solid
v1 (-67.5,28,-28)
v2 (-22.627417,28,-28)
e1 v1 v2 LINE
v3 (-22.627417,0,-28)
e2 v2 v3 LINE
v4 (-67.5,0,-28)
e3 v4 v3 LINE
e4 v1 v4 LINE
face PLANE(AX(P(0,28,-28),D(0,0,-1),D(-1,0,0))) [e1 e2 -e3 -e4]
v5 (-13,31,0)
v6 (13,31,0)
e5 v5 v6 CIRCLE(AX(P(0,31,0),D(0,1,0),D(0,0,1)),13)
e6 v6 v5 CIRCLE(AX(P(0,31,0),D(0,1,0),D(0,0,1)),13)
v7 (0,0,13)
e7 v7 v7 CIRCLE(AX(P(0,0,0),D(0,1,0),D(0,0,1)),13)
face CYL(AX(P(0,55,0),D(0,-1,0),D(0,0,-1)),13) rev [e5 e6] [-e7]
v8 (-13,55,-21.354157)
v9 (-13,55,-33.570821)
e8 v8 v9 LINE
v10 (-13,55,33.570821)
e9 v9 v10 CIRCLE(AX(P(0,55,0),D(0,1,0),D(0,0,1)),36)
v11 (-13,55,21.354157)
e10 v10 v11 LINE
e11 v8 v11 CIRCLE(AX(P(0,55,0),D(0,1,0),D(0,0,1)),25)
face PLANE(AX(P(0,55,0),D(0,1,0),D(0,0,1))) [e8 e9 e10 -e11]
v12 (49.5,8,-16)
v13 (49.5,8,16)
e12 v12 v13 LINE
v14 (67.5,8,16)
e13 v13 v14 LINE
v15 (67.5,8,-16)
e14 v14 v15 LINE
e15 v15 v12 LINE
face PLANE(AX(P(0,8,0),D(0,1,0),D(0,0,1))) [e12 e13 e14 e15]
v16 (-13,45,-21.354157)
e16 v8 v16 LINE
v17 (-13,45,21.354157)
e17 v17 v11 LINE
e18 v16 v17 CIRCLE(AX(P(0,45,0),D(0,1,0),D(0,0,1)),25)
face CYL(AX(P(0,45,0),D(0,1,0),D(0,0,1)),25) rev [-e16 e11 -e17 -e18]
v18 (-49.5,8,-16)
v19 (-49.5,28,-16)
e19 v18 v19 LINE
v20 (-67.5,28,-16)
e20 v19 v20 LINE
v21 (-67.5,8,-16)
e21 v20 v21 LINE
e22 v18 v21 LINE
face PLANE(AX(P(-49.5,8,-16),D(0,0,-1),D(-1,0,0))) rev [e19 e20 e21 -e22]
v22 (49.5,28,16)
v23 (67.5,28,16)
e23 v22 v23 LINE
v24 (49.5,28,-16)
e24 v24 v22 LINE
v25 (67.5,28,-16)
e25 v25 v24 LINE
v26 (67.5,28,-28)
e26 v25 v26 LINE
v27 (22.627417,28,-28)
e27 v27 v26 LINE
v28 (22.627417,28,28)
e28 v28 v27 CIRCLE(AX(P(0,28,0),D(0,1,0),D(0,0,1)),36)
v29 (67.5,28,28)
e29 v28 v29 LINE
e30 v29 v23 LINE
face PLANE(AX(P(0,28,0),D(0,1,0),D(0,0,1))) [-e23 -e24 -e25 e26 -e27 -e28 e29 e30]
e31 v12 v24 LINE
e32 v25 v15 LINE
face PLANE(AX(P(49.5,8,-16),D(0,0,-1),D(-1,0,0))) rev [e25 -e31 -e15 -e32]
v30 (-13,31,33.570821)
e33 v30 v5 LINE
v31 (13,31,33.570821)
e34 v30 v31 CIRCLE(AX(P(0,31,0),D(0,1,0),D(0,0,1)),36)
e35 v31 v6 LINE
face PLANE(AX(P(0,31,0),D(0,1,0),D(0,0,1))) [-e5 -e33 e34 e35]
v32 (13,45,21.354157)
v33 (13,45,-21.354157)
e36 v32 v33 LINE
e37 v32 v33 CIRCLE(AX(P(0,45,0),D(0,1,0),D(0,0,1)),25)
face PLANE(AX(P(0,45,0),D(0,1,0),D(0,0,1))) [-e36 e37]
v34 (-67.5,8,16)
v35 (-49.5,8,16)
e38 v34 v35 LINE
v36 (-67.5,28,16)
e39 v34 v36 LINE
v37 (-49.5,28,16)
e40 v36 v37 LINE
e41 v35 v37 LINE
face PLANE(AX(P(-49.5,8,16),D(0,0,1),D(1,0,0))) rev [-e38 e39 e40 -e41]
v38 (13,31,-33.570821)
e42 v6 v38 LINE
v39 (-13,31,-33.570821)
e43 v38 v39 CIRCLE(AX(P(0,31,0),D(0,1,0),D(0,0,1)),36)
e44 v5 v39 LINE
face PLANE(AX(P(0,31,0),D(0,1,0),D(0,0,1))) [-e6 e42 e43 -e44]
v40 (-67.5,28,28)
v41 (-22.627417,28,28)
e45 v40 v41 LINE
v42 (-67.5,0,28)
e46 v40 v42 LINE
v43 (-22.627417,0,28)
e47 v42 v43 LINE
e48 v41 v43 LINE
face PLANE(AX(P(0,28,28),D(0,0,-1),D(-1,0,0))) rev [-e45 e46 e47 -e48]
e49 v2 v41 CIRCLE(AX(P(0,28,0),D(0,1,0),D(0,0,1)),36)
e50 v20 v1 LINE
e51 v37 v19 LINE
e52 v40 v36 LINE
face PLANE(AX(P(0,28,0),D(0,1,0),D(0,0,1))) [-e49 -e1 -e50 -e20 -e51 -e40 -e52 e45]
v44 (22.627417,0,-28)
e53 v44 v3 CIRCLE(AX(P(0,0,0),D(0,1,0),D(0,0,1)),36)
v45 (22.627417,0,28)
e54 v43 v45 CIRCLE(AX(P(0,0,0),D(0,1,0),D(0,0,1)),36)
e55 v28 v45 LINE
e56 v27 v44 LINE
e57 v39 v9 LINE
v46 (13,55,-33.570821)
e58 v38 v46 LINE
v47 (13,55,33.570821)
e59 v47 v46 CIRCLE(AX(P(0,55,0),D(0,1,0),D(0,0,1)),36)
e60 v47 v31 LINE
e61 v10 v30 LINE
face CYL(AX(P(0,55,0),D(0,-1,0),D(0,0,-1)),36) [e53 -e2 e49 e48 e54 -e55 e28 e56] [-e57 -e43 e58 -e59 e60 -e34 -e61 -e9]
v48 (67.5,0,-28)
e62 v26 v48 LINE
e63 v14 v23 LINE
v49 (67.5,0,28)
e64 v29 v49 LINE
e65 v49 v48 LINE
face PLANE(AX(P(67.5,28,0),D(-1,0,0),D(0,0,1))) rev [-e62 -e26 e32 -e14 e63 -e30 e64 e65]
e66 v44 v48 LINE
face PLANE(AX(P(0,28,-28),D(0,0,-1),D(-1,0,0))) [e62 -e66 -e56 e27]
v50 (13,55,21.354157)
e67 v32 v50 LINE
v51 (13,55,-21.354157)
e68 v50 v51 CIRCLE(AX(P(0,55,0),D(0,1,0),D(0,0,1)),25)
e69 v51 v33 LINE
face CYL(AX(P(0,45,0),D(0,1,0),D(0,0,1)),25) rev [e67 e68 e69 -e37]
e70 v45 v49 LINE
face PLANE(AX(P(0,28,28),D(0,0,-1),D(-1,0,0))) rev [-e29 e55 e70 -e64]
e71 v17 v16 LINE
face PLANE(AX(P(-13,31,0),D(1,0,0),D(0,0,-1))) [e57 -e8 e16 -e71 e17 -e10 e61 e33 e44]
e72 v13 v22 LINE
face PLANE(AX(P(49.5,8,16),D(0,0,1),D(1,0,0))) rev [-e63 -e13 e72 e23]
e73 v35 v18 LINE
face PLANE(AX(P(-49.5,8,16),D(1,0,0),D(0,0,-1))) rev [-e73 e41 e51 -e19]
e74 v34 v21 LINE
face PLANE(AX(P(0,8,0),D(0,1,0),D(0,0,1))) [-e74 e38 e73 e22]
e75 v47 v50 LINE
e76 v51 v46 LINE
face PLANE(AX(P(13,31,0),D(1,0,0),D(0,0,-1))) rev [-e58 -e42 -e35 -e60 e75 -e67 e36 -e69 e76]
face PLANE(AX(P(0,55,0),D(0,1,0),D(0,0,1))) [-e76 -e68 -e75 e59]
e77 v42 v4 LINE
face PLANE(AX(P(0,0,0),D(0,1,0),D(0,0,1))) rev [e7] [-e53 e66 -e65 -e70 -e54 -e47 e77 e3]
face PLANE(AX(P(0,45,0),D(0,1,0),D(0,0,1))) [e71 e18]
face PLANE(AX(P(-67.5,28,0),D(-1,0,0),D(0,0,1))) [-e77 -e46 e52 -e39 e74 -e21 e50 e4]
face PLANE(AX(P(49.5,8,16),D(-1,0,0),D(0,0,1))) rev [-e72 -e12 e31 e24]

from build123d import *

# Parameters (mm, degrees)
BOSS_EXTRUDE1_DEPTH   = 28
BOSS_EXTRUDE1_2_DEPTH = 28
SKETCH1_4_R           = 36
BOSS_EXTRUDE2_DEPTH   = 55
SKETCH1_5_R           = 13
CUT_EXTRUDE1_DEPTH    = 95.21915941
CUT_EXTRUDE2_START    = -10
SKETCH2_R             = 25
SKETCH2_R_2           = 13
CUT_EXTRUDE2_DEPTH    = 10
SKETCH2_3_W           = 26
SKETCH2_3_H           = 91.506160118
CUT_EXTRUDE3_DEPTH    = 24
SKETCH3_W             = 36
SKETCH3_H             = 32
CUT_EXTRUDE4_DEPTH    = 20


with BuildPart() as part:
    # Sketch1 → Boss-Extrude1 (new body)
    with BuildSketch(Plane(origin=(0, 0, 0), x_dir=(1, 0, 0), z_dir=(0, 1, 0))):
        with BuildLine():
            Line((-67.5, 28), (-67.5, -28))
            Line((-67.5, -28), (-22.627416998, -28))
            ThreePointArc((-22.627416998, -28), (-36, 0), (-22.627416998, 28))
            Line((-22.627416998, 28), (-67.5, 28))
        make_face()
    extrude(amount=BOSS_EXTRUDE1_DEPTH)



with BuildPart() as body_2:
    # Sketch1 → Boss-Extrude1 2 (new body)
    with BuildSketch(Plane(origin=(0, 0, 0), x_dir=(1, 0, 0), z_dir=(0, 1, 0))):
        with BuildLine():
            ThreePointArc((22.627416998, 28), (36, 0), (22.627416998, -28))
            Line((22.627416998, -28), (67.5, -28))
            Line((67.5, -28), (67.5, 28))
            Line((67.5, 28), (22.627416998, 28))
        make_face()
    extrude(amount=BOSS_EXTRUDE1_2_DEPTH)


with BuildPart() as part_1:
    add(part.part)

    add(body_2.part)  # Boss-Extrude2 merges body 2
    # Sketch1<4> → Boss-Extrude2 (add)
    with BuildSketch(Plane(origin=(0, 0, 0), x_dir=(1, 0, 0), z_dir=(0, 1, 0))):
        Circle(SKETCH1_4_R)
    extrude(amount=BOSS_EXTRUDE2_DEPTH)

    # Sketch1<5> → Cut-Extrude1 (cut, through all)
    with BuildSketch(Plane(origin=(0, 0, 0), x_dir=(1, 0, 0), z_dir=(0, 1, 0))):
        Circle(SKETCH1_5_R)
    extrude(amount=CUT_EXTRUDE1_DEPTH, mode=Mode.SUBTRACT)

    # Sketch2 → Cut-Extrude2 (cut)
    with BuildSketch(Plane(origin=(0, 55, 0), x_dir=(1, 0, 0), z_dir=(0, 1, 0)).offset(CUT_EXTRUDE2_START)):
        Circle(SKETCH2_R)
        Circle(SKETCH2_R_2, mode=Mode.SUBTRACT)
    extrude(amount=CUT_EXTRUDE2_DEPTH, mode=Mode.SUBTRACT)

    # Sketch2<3> → Cut-Extrude3 (cut)
    with BuildSketch(Plane(origin=(0, 55, 0), x_dir=(1, 0, 0), z_dir=(0, 1, 0))):
        Rectangle(SKETCH2_3_W, SKETCH2_3_H)
    extrude(amount=-CUT_EXTRUDE3_DEPTH, mode=Mode.SUBTRACT)

    # Sketch3 → Cut-Extrude4 (cut)
    with BuildSketch(Plane(origin=(0, 28, 0), x_dir=(1, 0, 0), z_dir=(0, 1, 0))):
        with Locations((67.5, 0)):
            Rectangle(SKETCH3_W, SKETCH3_H)
        with Locations((-67.5, 0)):
            Rectangle(SKETCH3_W, SKETCH3_H)
    extrude(amount=-CUT_EXTRUDE4_DEPTH, mode=Mode.SUBTRACT)


solid = part_1.part
